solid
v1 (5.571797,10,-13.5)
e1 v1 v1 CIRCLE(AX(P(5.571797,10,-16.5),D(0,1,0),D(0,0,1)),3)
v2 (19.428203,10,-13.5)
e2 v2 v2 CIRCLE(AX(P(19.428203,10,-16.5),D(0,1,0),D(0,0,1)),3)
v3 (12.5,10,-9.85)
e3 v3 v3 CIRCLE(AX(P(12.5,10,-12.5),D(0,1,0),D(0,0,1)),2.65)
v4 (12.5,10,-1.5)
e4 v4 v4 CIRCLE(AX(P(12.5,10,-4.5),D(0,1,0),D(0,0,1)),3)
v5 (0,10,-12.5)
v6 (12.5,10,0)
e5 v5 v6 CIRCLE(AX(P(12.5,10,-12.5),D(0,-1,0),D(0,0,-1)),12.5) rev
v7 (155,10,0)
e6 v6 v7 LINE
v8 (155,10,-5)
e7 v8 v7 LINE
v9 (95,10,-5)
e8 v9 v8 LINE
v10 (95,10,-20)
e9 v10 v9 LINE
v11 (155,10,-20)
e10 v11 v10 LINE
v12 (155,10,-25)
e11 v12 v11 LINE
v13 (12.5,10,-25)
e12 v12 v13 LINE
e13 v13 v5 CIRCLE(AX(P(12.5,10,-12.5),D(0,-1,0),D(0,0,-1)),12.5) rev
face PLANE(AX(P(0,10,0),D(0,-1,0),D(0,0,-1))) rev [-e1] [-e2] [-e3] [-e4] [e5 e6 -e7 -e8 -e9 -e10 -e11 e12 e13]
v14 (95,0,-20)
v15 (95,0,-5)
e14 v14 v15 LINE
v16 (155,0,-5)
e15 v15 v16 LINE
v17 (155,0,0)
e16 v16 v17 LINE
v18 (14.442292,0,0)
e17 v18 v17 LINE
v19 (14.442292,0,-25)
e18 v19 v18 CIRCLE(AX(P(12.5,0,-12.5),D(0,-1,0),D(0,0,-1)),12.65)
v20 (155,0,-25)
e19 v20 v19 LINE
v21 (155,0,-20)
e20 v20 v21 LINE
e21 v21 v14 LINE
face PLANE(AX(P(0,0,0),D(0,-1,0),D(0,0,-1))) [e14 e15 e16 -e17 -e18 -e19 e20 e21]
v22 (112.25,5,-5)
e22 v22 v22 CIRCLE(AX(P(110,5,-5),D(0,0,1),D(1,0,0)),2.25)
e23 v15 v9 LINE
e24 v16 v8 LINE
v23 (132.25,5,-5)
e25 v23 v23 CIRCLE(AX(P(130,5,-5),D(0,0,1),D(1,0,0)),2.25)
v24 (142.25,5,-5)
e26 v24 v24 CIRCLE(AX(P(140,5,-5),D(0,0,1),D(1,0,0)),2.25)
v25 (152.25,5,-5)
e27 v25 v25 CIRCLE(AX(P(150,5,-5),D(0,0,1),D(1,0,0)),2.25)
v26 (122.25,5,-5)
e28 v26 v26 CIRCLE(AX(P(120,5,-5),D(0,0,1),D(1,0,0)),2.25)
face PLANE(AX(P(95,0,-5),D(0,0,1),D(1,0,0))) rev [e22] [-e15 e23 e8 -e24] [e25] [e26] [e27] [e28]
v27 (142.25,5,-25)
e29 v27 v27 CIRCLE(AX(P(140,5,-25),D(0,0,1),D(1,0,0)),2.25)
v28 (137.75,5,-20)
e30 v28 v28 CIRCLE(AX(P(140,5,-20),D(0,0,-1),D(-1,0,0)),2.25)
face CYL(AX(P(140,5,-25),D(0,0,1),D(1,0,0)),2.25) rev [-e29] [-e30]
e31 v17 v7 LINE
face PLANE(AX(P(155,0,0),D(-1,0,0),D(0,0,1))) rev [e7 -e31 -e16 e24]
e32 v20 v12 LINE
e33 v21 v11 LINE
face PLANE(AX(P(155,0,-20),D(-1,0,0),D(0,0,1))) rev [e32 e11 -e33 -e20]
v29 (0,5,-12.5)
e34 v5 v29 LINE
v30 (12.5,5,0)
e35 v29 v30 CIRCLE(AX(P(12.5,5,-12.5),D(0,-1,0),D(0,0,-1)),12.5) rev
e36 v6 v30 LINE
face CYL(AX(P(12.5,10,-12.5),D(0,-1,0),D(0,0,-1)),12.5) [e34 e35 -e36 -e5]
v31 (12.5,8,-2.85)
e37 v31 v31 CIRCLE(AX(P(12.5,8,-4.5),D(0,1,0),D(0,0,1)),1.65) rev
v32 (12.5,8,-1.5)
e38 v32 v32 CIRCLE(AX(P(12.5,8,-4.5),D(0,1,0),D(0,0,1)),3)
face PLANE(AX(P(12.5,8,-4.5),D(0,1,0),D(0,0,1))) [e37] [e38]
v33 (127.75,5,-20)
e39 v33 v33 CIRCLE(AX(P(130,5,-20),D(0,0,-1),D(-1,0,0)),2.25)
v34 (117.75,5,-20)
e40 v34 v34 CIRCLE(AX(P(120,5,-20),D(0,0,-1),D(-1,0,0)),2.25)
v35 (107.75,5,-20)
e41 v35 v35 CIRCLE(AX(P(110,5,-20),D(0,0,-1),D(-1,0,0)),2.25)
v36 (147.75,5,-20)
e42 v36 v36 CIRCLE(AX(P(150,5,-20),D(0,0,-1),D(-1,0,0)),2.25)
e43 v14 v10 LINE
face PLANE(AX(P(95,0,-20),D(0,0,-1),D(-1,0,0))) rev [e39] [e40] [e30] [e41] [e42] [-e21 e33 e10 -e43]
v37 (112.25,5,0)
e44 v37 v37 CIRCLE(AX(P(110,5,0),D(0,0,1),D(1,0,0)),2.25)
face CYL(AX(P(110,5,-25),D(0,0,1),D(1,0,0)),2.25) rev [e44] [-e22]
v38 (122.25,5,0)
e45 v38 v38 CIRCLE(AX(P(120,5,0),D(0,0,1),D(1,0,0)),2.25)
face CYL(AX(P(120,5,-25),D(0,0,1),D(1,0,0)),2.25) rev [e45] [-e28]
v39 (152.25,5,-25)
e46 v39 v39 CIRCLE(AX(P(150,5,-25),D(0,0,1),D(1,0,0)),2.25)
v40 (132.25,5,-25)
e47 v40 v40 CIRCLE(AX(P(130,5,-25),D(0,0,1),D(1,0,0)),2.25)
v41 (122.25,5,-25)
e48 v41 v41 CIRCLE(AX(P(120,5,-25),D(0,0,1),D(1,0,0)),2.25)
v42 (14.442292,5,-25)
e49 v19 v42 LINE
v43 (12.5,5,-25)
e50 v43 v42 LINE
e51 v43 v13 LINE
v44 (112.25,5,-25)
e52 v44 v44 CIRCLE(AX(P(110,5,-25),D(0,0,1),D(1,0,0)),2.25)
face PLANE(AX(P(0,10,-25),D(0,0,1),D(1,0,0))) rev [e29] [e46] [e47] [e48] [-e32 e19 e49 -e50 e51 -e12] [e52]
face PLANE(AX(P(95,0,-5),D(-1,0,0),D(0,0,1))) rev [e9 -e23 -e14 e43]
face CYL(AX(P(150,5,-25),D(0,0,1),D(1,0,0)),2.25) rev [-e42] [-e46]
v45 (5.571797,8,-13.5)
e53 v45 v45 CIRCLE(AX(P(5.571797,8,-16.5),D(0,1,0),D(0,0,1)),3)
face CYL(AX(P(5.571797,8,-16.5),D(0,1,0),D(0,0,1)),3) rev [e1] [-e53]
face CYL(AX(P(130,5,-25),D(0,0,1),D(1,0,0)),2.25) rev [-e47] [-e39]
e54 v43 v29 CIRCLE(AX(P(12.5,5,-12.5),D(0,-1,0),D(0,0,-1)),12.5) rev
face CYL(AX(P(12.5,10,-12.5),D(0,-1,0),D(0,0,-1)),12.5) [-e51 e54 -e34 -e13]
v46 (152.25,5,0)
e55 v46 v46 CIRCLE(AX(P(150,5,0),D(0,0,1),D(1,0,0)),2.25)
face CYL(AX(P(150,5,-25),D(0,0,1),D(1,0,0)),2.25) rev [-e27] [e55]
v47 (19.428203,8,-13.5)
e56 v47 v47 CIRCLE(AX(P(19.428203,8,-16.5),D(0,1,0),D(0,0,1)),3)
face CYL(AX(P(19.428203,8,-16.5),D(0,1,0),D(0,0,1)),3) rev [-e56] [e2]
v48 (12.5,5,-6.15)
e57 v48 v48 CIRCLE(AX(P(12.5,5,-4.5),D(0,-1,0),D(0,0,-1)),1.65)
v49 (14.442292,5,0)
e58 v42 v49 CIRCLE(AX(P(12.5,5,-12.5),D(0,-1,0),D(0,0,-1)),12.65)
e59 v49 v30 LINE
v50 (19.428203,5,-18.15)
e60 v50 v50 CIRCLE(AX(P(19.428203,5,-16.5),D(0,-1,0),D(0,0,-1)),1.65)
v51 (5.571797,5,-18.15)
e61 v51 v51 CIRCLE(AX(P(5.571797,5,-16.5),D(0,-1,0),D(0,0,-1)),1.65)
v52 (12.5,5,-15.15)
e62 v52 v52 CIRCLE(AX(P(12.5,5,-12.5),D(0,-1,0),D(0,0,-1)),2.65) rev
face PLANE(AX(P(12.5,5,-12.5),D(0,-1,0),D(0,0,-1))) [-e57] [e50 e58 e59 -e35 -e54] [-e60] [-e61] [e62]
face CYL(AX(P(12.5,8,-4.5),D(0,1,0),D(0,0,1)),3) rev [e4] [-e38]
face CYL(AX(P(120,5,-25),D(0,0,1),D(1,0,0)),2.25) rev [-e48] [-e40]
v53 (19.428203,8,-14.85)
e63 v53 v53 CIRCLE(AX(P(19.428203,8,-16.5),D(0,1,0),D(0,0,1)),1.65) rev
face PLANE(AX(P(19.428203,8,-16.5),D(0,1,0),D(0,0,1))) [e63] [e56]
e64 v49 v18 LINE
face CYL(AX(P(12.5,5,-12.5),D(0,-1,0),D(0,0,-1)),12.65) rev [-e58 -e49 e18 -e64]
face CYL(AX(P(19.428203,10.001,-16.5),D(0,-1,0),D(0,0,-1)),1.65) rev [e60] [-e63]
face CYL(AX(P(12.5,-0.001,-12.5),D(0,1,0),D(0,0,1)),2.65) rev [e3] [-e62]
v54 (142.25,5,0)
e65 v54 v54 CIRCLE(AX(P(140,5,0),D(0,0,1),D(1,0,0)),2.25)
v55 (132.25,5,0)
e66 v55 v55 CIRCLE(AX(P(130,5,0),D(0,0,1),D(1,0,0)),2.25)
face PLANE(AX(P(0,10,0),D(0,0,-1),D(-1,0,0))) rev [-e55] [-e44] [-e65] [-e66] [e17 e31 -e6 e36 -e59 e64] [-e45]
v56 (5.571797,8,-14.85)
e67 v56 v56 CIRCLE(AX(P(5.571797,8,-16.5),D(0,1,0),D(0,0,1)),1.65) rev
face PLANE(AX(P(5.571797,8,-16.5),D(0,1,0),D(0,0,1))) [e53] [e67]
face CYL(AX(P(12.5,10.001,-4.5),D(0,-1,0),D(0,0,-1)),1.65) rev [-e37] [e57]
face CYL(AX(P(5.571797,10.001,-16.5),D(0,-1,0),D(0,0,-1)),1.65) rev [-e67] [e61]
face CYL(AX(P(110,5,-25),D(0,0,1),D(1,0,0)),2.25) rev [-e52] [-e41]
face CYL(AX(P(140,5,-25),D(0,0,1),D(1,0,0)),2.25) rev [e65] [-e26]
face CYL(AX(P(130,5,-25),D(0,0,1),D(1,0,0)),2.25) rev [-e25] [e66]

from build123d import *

# Parameters (mm, degrees)
SKETCH1_W           = 250
SKETCH1_H           = 25
BOSS_EXTRUDE1_DEPTH = 10
CUT_EXTRUDE1_REACH  = 253.446
SKETCH2_R           = 2.65
FILLET1_R           = 12.5
SKETCH3_R           = 2.25
CUT_EXTRUDE2_DEPTH  = 252.445819214
CUT_EXTRUDE5_REACH  = 253.446
SKETCH5_W           = 7.3
SKETCH5_H           = 4
SKETCH6_R           = 12.65
CUT_EXTRUDE6_DEPTH  = 5
CUT_EXTRUDE7_REACH  = 253.297
SKETCH7_R           = 1.65
SKETCH9_R           = 3
CUT_EXTRUDE9_DEPTH  = 2
CUT_EXTRUDE10_DEPTH = 252.445819214
SKETCH11_R          = 2.25
CUT_EXTRUDE11_DEPTH = 158.321327226


with BuildPart() as part:
    # Sketch1 → Boss-Extrude1 (new body)
    with BuildSketch(Plane(origin=(0, 0, 0), x_dir=(1, 0, 0), z_dir=(0, 1, 0))):
        with Locations((125, 12.5)):
            Rectangle(SKETCH1_W, SKETCH1_H)
    extrude(amount=BOSS_EXTRUDE1_DEPTH)

    # Sketch2 → Cut-Extrude1 (cut, up to next)
    with BuildSketch(Plane(origin=(0, 10, 0), x_dir=(1, 0, 0), z_dir=(0, 1, 0)), mode=Mode.PRIVATE) as cut_extrude1_sk1:
        with Locations(Location((12.5, 12.5, 0), (0, 0, 270))):
            Circle(SKETCH2_R)
    cut_extrude1_tool1 = extrude(cut_extrude1_sk1.sketch, amount=-CUT_EXTRUDE1_REACH, mode=Mode.PRIVATE) & part.part
    add(cut_extrude1_tool1.solids().sort_by_distance((12.5, 10, -12.5))[0], mode=Mode.SUBTRACT)

    # Fillet1
    fillet1_edges = [part.edges().sort_by_distance(p)[0] for p in [
        (0, 5, 0),
        (0, 5, -25),
    ]]
    fillet(fillet1_edges, radius=FILLET1_R - 0.0001)  # a hair under: the kernel refuses the full size

    # Sketch3 → Cut-Extrude2 (cut, through all)
    with BuildSketch(Plane(origin=(0, 0, -25), x_dir=(-1, 0, 0), z_dir=(0, 0, -1))):
        with Locations((-244.5, 5)):
            Circle(SKETCH3_R)
        with Locations((-230.5, 5)):
            Circle(SKETCH3_R)
    extrude(amount=-CUT_EXTRUDE2_DEPTH, mode=Mode.SUBTRACT)

    # Sketch5 → Cut-Extrude5 (cut, up to next)
    with BuildSketch(Plane(origin=(0, 10, 0), x_dir=(1, 0, 0), z_dir=(0, 1, 0)), mode=Mode.PRIVATE) as cut_extrude5_sk1:
        with Locations((244.5, 19)):
            Rectangle(SKETCH5_W, SKETCH5_H)
    cut_extrude5_tool1 = extrude(cut_extrude5_sk1.sketch, amount=-CUT_EXTRUDE5_REACH, mode=Mode.PRIVATE) & part.part
    # Sketch5 → Cut-Extrude5 (cut, up to next)
    with BuildSketch(Plane(origin=(0, 10, 0), x_dir=(1, 0, 0), z_dir=(0, 1, 0)), mode=Mode.PRIVATE) as cut_extrude5_sk2:
        with Locations((244.5, 6)):
            Rectangle(SKETCH5_W, SKETCH5_H)
    cut_extrude5_tool2 = extrude(cut_extrude5_sk2.sketch, amount=-CUT_EXTRUDE5_REACH, mode=Mode.PRIVATE) & part.part
    # Sketch5 → Cut-Extrude5 (cut, up to next)
    with BuildSketch(Plane(origin=(0, 10, 0), x_dir=(1, 0, 0), z_dir=(0, 1, 0)), mode=Mode.PRIVATE) as cut_extrude5_sk3:
        with Locations((230.5, 19)):
            Rectangle(SKETCH5_W, SKETCH5_H)
    cut_extrude5_tool3 = extrude(cut_extrude5_sk3.sketch, amount=-CUT_EXTRUDE5_REACH, mode=Mode.PRIVATE) & part.part
    # Sketch5 → Cut-Extrude5 (cut, up to next)
    with BuildSketch(Plane(origin=(0, 10, 0), x_dir=(1, 0, 0), z_dir=(0, 1, 0)), mode=Mode.PRIVATE) as cut_extrude5_sk4:
        with Locations((230.5, 6)):
            Rectangle(SKETCH5_W, SKETCH5_H)
    cut_extrude5_tool4 = extrude(cut_extrude5_sk4.sketch, amount=-CUT_EXTRUDE5_REACH, mode=Mode.PRIVATE) & part.part
    add(cut_extrude5_tool1.solids().sort_by_distance((244.5, 10, -19))[0], mode=Mode.SUBTRACT)
    add(cut_extrude5_tool2.solids().sort_by_distance((244.5, 10, -6))[0], mode=Mode.SUBTRACT)
    add(cut_extrude5_tool3.solids().sort_by_distance((230.5, 10, -19))[0], mode=Mode.SUBTRACT)
    add(cut_extrude5_tool4.solids().sort_by_distance((230.5, 10, -6))[0], mode=Mode.SUBTRACT)

    # Sketch6 → Cut-Extrude6 (cut)
    with BuildSketch(Plane.XZ):
        with Locations((12.5, -12.5)):
            Circle(SKETCH6_R)
    extrude(amount=-CUT_EXTRUDE6_DEPTH, mode=Mode.SUBTRACT)

    # Sketch7 → Cut-Extrude7 (cut, up to next)
    with BuildSketch(Plane.XZ.offset(-5), mode=Mode.PRIVATE) as cut_extrude7_sk1:
        with Locations(Location((12.5, -4.5, 0), (0, 0, 270))):
            Circle(SKETCH7_R)
    cut_extrude7_tool1 = extrude(cut_extrude7_sk1.sketch, amount=-CUT_EXTRUDE7_REACH, mode=Mode.PRIVATE) & part.part
    # Sketch7 → Cut-Extrude7 (cut, up to next)
    with BuildSketch(Plane.XZ.offset(-5), mode=Mode.PRIVATE) as cut_extrude7_sk2:
        with Locations(Location((19.42820323, -16.5, 0), (0, 0, 270))):
            Circle(SKETCH7_R)
    cut_extrude7_tool2 = extrude(cut_extrude7_sk2.sketch, amount=-CUT_EXTRUDE7_REACH, mode=Mode.PRIVATE) & part.part
    # Sketch7 → Cut-Extrude7 (cut, up to next)
    with BuildSketch(Plane.XZ.offset(-5), mode=Mode.PRIVATE) as cut_extrude7_sk3:
        with Locations(Location((5.57179677, -16.5, 0), (0, 0, 270))):
            Circle(SKETCH7_R)
    cut_extrude7_tool3 = extrude(cut_extrude7_sk3.sketch, amount=-CUT_EXTRUDE7_REACH, mode=Mode.PRIVATE) & part.part
    add(cut_extrude7_tool1.solids().sort_by_distance((12.5, 5, -4.5))[0], mode=Mode.SUBTRACT)
    add(cut_extrude7_tool2.solids().sort_by_distance((19.428203, 5, -16.5))[0], mode=Mode.SUBTRACT)
    add(cut_extrude7_tool3.solids().sort_by_distance((5.571797, 5, -16.5))[0], mode=Mode.SUBTRACT)

    # Sketch9 → Cut-Extrude9 (cut)
    with BuildSketch(Plane(origin=(0, 10, 0), x_dir=(1, 0, 0), z_dir=(0, 1, 0))):
        with Locations(Location((5.57179677, 16.5, 0), (0, 0, 270))):
            Circle(SKETCH9_R)
        with Locations(Location((12.5, 4.5, 0), (0, 0, 270))):
            Circle(SKETCH9_R)
        with Locations(Location((19.42820323, 16.5, 0), (0, 0, 270))):
            Circle(SKETCH9_R)
    extrude(amount=-CUT_EXTRUDE9_DEPTH, mode=Mode.SUBTRACT)

    # Sketch10 → Cut-Extrude10 (cut, through all)
    with BuildSketch(Plane(origin=(0, 10, 0), x_dir=(1, 0, 0), z_dir=(0, 1, 0))):
        Polygon((95, 5), (155, 5), (155, 0), (250, 0), (250, 25), (155, 25), (155, 20), (95, 20), align=None)
    extrude(amount=-CUT_EXTRUDE10_DEPTH, mode=Mode.SUBTRACT)

    # Sketch11 → Cut-Extrude11 (cut, through all)
    with BuildSketch(Plane.XY):
        with Locations((150, 5)):
            Circle(SKETCH11_R)
        with Locations((140, 5)):
            Circle(SKETCH11_R)
        with Locations((130, 5)):
            Circle(SKETCH11_R)
        with Locations((120, 5)):
            Circle(SKETCH11_R)
        with Locations((110, 5)):
            Circle(SKETCH11_R)
    extrude(amount=-CUT_EXTRUDE11_DEPTH, mode=Mode.SUBTRACT)


solid = part.part
